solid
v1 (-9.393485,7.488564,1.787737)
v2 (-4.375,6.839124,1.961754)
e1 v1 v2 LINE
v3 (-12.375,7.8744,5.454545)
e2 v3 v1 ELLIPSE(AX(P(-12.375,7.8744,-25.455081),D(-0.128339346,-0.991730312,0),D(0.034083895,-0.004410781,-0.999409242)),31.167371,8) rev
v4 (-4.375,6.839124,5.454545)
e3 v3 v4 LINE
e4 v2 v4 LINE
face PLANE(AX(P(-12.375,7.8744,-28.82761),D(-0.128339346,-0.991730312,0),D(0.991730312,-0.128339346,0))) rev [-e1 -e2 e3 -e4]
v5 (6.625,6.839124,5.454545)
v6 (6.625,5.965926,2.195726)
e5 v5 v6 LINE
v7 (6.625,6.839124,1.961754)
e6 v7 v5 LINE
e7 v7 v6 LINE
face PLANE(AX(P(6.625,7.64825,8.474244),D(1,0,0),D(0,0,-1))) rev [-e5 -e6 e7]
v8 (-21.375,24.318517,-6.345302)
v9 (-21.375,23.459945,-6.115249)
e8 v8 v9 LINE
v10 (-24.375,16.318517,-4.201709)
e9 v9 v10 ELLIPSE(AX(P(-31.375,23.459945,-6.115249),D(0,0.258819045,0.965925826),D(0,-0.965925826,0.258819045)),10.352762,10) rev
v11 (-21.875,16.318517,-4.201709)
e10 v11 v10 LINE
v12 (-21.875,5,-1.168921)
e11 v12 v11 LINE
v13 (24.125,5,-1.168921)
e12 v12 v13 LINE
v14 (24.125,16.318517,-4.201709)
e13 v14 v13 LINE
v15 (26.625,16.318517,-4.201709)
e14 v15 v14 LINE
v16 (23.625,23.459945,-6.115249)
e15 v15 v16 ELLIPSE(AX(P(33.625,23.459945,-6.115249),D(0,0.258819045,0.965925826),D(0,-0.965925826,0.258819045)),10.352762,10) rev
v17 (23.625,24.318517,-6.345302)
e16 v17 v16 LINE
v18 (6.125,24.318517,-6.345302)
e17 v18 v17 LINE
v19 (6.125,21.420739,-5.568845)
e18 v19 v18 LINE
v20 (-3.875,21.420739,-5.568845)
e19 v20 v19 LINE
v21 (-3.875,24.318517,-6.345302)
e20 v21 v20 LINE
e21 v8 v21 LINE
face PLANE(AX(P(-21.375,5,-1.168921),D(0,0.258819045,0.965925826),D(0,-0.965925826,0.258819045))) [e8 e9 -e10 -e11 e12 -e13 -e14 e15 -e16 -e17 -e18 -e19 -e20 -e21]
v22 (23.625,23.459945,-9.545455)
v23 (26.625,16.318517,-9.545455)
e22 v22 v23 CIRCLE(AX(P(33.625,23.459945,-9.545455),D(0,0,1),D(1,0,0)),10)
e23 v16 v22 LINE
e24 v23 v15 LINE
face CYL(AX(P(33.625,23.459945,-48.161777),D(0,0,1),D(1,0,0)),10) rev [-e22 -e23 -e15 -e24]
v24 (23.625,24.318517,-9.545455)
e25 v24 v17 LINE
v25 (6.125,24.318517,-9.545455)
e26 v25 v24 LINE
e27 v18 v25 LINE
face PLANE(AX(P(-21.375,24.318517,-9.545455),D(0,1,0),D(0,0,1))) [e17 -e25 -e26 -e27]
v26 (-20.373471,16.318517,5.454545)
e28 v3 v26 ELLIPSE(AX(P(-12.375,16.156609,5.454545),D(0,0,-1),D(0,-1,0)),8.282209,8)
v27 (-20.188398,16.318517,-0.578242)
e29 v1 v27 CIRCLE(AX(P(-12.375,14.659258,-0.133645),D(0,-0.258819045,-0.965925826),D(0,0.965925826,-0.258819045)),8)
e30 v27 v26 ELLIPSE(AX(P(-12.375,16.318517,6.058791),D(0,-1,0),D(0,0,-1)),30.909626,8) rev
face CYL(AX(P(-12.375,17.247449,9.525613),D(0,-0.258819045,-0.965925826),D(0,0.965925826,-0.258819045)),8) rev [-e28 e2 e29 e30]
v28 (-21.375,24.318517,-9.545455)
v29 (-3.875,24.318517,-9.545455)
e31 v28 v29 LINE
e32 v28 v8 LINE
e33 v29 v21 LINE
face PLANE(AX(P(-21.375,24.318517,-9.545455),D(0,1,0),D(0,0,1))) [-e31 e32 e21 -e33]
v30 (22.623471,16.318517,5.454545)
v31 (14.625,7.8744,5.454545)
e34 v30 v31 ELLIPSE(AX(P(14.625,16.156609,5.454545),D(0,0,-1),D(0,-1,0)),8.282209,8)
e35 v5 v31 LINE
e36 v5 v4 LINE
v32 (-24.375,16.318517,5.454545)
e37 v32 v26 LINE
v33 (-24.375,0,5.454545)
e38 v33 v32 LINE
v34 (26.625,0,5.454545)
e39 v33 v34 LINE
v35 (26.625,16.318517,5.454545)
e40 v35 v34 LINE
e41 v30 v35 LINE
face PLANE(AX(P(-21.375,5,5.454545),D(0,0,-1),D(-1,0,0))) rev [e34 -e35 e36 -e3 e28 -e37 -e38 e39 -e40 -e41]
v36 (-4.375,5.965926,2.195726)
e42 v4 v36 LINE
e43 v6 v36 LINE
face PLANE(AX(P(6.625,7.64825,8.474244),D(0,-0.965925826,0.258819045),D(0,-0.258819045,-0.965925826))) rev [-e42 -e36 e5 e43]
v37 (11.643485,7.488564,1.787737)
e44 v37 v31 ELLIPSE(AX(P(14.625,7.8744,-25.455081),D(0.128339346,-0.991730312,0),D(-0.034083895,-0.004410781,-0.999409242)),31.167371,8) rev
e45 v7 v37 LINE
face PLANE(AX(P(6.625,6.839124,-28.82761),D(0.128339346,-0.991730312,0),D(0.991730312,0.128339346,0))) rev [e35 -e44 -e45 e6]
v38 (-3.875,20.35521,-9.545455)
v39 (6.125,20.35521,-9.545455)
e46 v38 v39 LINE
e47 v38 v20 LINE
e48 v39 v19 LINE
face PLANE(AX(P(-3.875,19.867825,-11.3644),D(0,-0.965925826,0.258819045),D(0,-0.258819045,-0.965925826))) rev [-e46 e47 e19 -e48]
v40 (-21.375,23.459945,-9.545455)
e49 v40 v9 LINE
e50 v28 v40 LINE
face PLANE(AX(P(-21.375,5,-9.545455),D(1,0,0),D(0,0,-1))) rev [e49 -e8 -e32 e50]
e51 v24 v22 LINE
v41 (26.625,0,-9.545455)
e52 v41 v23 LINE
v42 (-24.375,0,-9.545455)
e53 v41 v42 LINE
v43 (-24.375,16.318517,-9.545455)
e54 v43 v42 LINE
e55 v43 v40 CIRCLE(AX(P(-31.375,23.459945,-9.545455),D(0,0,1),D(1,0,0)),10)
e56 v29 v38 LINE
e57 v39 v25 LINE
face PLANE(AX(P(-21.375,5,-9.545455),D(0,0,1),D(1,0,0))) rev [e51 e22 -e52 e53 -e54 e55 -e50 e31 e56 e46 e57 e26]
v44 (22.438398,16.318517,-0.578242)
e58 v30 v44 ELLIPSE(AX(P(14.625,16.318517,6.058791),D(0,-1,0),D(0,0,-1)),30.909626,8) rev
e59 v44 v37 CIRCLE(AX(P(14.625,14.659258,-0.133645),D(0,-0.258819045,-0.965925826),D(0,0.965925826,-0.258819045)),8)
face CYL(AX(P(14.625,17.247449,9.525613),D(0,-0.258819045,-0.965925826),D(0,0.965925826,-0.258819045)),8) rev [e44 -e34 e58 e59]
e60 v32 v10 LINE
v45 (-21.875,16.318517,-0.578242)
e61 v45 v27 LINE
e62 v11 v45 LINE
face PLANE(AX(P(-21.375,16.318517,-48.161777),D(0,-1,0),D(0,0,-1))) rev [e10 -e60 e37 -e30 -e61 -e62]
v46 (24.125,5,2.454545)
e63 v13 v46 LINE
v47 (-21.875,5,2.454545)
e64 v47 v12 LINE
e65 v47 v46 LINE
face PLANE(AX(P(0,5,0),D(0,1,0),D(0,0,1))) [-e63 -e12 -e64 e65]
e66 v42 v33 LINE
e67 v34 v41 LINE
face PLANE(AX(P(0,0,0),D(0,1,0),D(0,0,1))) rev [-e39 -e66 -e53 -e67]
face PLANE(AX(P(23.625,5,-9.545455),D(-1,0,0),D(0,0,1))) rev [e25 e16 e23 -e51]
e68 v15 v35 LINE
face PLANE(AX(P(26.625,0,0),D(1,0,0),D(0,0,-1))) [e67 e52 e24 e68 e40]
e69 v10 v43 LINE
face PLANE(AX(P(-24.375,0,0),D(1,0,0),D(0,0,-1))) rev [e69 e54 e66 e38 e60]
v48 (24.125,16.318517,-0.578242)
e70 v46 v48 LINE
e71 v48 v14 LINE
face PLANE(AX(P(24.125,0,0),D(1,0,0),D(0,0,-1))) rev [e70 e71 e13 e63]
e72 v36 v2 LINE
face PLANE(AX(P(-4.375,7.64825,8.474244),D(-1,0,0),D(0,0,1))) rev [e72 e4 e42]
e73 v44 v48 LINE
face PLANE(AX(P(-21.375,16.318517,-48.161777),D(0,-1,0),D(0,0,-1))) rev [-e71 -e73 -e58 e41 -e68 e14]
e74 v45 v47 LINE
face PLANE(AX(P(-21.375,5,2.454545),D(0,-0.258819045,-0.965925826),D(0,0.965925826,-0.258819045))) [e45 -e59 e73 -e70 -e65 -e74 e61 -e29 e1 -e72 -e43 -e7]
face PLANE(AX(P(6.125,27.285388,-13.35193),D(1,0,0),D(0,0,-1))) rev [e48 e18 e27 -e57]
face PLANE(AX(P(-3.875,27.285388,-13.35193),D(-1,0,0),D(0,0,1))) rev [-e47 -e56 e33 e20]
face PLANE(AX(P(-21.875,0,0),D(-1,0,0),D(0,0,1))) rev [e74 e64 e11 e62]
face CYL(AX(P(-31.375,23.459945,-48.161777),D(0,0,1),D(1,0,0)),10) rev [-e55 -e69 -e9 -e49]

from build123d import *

# Parameters (mm, degrees)
SKETCH1_W           = 45
SKETCH1_H           = 15
BOSS_EXTRUDE1_DEPTH = 5
BOSS_EXTRUDE2_DEPTH = 45
SKETCH5_R           = 8
CUT_EXTRUDE1_DEPTH  = 10
CUT_EXTRUDE2_REACH  = 39.075
SKETCH6_W           = 45
SKETCH6_H           = 8
SKETCH7_W           = 11
SKETCH7_H           = 10.717790556
CUT_EXTRUDE4_DEPTH  = 6.5
CUT_EXTRUDE5_REACH  = 39.075
SKETCH10_W          = 15
SKETCH10_H          = 16.318516526
BOSS_EXTRUDE3_DEPTH = 3
SKETCH11_W          = 15
SKETCH11_H          = 16.318516526
BOSS_EXTRUDE4_DEPTH = 3
SKETCH12_W          = 10
SKETCH12_H          = 7.679226714
CUT_EXTRUDE6_DEPTH  = 6
FILLET1_R           = 10
CUT_EXTRUDE7_DEPTH  = 0.5
CUT_EXTRUDE8_DEPTH  = 0.5


with BuildPart() as part:
    # Sketch1 → Boss-Extrude1 (new body)
    with BuildSketch(Plane(origin=(0, 0, 0), x_dir=(1, 0, 0), z_dir=(0, 1, 0))):
        with Locations((1.125, 2.045454545)):
            Rectangle(SKETCH1_W, SKETCH1_H)
    extrude(amount=BOSS_EXTRUDE1_DEPTH)

    # Sketch2 → Boss-Extrude2 (add)
    with BuildSketch(Plane(origin=(23.625, 0, 0), x_dir=(0, 0, -1), z_dir=(1, 0, 0))):
        Polygon((-2.454545455, 5), (2.721835448, 24.318516526), (-5.454545455, 24.318516526), (-5.454545455, 5), align=None)
        Polygon((1.168921177, 5), (6.345302079, 24.318516526), (9.545454545, 24.318516526), (9.545454545, 5), align=None)
    extrude(amount=-BOSS_EXTRUDE2_DEPTH)

    # Sketch5 → Cut-Extrude1 (cut)
    with BuildSketch(Plane(origin=(0, 0.948572854, 3.540122086), x_dir=(-1, 0, 0), z_dir=(0, -0.2588190451025247, -0.9659258262890673))):
        with Locations(Location((12.375, 14.194346021, 0), (0, 0, 90))):
            Circle(SKETCH5_R)
        with Locations(Location((-14.625, 14.194346021, 0), (0, 0, 90))):
            Circle(SKETCH5_R)
    extrude(amount=-CUT_EXTRUDE1_DEPTH, mode=Mode.SUBTRACT)

    # Cut-Extrude2: up to this plane
    cut_extrude2_end = Plane(origin=(-21.375, 5, 2.454545455), z_dir=(0, -0.2588190451025246, -0.9659258262890673))
    # Sketch6 → Cut-Extrude2 (cut, up to the surface)
    with BuildSketch(Plane.XY.offset(5.454545455), mode=Mode.PRIVATE) as cut_extrude2_sk1:
        with Locations((1.125, 20.318516526)):
            Rectangle(SKETCH6_W, SKETCH6_H)
    cut_extrude2_tool1 = split(extrude(cut_extrude2_sk1.sketch, amount=-CUT_EXTRUDE2_REACH, mode=Mode.PRIVATE), bisect_by=cut_extrude2_end, keep=Keep.BOTH, mode=Mode.PRIVATE)
    add(cut_extrude2_tool1.solids().sort_by_distance((1.125, 20.318517, 5.454545))[0], mode=Mode.SUBTRACT)

    # Sketch7 → Cut-Extrude4 (cut)
    with BuildSketch(Plane(origin=(0, 0.948572854, 3.540122086), x_dir=(-1, 0, 0), z_dir=(0, -0.2588190451025247, -0.9659258262890673))):
        with Locations((-1.125, 10.553241299)):
            Rectangle(SKETCH7_W, SKETCH7_H)
    extrude(amount=-CUT_EXTRUDE4_DEPTH, mode=Mode.SUBTRACT)


with BuildPart() as cut_extrude4_piece_1:
    # of the separate pieces the step leaves, piece 1, a body of its own (cut_extrude4_pieces)
    add(part.part.solids().sort_by_distance((-21.375, 0, -9.545454545))[0])


with BuildPart() as cut_extrude4_piece_2:
    # of the separate pieces the step leaves, piece 2, a body of its own (cut_extrude4_pieces)
    add(part.part.solids().sort_by_distance((-4.375, 16.318516526, -0.578241908))[0])


with BuildPart() as cut_extrude4_piece_3:
    # of the separate pieces the step leaves, piece 3, a body of its own (cut_extrude4_pieces)
    add(part.part.solids().sort_by_distance((6.811601533, 16.318516526, -0.578241908))[0])


with BuildPart() as cut_extrude5_tool:
    # Cut-Extrude5: up to this plane
    cut_extrude5_end = Plane(origin=(-21.375, 5, 2.454545455), z_dir=(0, -0.2588190451025246, -0.9659258262890673))
    # Sketch9 → Cut-Extrude5 (new, up to the surface)
    with BuildSketch(Plane.XY.offset(5.454545455), mode=Mode.PRIVATE) as cut_extrude5_sk1:
        Polygon((-12.375, 7.874399938), (-4.375, 6.839123758), (6.625, 6.839123758), (14.625, 7.874399938), (14.625, 17.142741254), (-12.375, 17.142741254), align=None)
    cut_extrude5_tool1 = split(extrude(cut_extrude5_sk1.sketch, amount=-CUT_EXTRUDE5_REACH, mode=Mode.PRIVATE), bisect_by=cut_extrude5_end, keep=Keep.BOTH, mode=Mode.PRIVATE)
    add(cut_extrude5_tool1.solids().sort_by_distance((1.125, 12.138424, 5.454545))[0])


with BuildPart() as cut_extrude4_piece_1_1:
    add(cut_extrude4_piece_1.part)

    # Cut-Extrude5: cut by cut_extrude5_tool
    add(cut_extrude5_tool.part, mode=Mode.SUBTRACT)

    # Sketch10 → Boss-Extrude3 (add)
    with BuildSketch(Plane.ZY.offset(21.375)):
        with Locations((-2.045454545, 8.159258263)):
            Rectangle(SKETCH10_W, SKETCH10_H)
    extrude(amount=BOSS_EXTRUDE3_DEPTH)

    # Sketch11 → Boss-Extrude4 (add)
    with BuildSketch(Plane(origin=(23.625, 0, 0), x_dir=(0, 0, -1), z_dir=(1, 0, 0))):
        with Locations((2.045454545, 8.159258263)):
            Rectangle(SKETCH11_W, SKETCH11_H)
    extrude(amount=BOSS_EXTRUDE4_DEPTH)

    # Sketch12 → Cut-Extrude6 (cut)
    with BuildSketch(Plane(origin=(0, 0.042706196, 0.159381694), x_dir=(1, 0, 0), z_dir=(0, 0.2588190451025247, 0.9659258262890673))):
        with Locations((1.125, 25.971781551)):
            Rectangle(SKETCH12_W, SKETCH12_H)
    extrude(amount=-CUT_EXTRUDE6_DEPTH, mode=Mode.SUBTRACT)

    # Fillet1
    # the kernel refuses this fillet: 10 mm, written as the material it adds along each edge
    with BuildSketch(Plane(origin=(-21.375, 16.318516526, 13.651862532), x_dir=(-1, 0, 0), z_dir=(0, 0, -1))) as fillet1_piece_1_section:
        with BuildLine():
            CenterArc((10, 7.141428429), FILLET1_R, 180, 45.572995999)
            Line((0, 7.141428429), (0, 0))
            Line((0, 0), (3, 0))
        make_face()
    fillet1_piece_1 = extrude(amount=23.197317077, mode=Mode.PRIVATE)
    fillet1_piece_1 = split(fillet1_piece_1, bisect_by=Plane(origin=(-22.137016454, 20.028758468, -5.195864872), z_dir=(0, -0.2588190451025247, -0.9659258262890673)), keep=Keep.TOP, mode=Mode.PRIVATE)
    add(fillet1_piece_1)
    with BuildSketch(Plane(origin=(23.625, 16.318516526, 13.651862532), x_dir=(1, 0, 0), z_dir=(0, 0, -1))) as fillet1_piece_2_section:
        with BuildLine():
            CenterArc((10, -7.141428429), FILLET1_R, 134.427004001, 45.572995999)
            Line((0, -7.141428429), (0, 0))
            Line((0, 0), (3, 0))
        make_face()
    fillet1_piece_2 = extrude(amount=23.197317077, mode=Mode.PRIVATE)
    fillet1_piece_2 = split(fillet1_piece_2, bisect_by=Plane(origin=(24.387016454, 20.028758468, -5.195864872), z_dir=(0, -0.2588190451025247, -0.9659258262890673)), keep=Keep.TOP, mode=Mode.PRIVATE)
    add(fillet1_piece_2)

    # Sketch14 → Cut-Extrude7 (cut)
    with BuildSketch(Plane(origin=(-21.375, 0, 0), x_dir=(0, 0, -1), z_dir=(1, 0, 0))):
        Polygon((0.578241908, 16.318516526), (4.201708539, 16.318516526), (1.168921177, 5), (-2.454545455, 5), align=None)
    extrude(amount=-CUT_EXTRUDE7_DEPTH, mode=Mode.SUBTRACT)

    # Sketch15 → Cut-Extrude8 (cut)
    with BuildSketch(Plane.ZY.offset(-23.625)):
        Polygon((-4.201708539, 16.318516526), (-0.578241908, 16.318516526), (2.454545455, 5), (-1.168921177, 5), align=None)
    extrude(amount=-CUT_EXTRUDE8_DEPTH, mode=Mode.SUBTRACT)


with BuildPart() as cut_extrude4_piece_2_1:
    add(cut_extrude4_piece_2.part)

    # Cut-Extrude5: cut by cut_extrude5_tool
    add(cut_extrude5_tool.part, mode=Mode.SUBTRACT)


with BuildPart() as cut_extrude4_piece_3_1:
    add(cut_extrude4_piece_3.part)

    # Cut-Extrude5: cut by cut_extrude5_tool
    add(cut_extrude5_tool.part, mode=Mode.SUBTRACT)


solid = cut_extrude4_piece_1_1.part
